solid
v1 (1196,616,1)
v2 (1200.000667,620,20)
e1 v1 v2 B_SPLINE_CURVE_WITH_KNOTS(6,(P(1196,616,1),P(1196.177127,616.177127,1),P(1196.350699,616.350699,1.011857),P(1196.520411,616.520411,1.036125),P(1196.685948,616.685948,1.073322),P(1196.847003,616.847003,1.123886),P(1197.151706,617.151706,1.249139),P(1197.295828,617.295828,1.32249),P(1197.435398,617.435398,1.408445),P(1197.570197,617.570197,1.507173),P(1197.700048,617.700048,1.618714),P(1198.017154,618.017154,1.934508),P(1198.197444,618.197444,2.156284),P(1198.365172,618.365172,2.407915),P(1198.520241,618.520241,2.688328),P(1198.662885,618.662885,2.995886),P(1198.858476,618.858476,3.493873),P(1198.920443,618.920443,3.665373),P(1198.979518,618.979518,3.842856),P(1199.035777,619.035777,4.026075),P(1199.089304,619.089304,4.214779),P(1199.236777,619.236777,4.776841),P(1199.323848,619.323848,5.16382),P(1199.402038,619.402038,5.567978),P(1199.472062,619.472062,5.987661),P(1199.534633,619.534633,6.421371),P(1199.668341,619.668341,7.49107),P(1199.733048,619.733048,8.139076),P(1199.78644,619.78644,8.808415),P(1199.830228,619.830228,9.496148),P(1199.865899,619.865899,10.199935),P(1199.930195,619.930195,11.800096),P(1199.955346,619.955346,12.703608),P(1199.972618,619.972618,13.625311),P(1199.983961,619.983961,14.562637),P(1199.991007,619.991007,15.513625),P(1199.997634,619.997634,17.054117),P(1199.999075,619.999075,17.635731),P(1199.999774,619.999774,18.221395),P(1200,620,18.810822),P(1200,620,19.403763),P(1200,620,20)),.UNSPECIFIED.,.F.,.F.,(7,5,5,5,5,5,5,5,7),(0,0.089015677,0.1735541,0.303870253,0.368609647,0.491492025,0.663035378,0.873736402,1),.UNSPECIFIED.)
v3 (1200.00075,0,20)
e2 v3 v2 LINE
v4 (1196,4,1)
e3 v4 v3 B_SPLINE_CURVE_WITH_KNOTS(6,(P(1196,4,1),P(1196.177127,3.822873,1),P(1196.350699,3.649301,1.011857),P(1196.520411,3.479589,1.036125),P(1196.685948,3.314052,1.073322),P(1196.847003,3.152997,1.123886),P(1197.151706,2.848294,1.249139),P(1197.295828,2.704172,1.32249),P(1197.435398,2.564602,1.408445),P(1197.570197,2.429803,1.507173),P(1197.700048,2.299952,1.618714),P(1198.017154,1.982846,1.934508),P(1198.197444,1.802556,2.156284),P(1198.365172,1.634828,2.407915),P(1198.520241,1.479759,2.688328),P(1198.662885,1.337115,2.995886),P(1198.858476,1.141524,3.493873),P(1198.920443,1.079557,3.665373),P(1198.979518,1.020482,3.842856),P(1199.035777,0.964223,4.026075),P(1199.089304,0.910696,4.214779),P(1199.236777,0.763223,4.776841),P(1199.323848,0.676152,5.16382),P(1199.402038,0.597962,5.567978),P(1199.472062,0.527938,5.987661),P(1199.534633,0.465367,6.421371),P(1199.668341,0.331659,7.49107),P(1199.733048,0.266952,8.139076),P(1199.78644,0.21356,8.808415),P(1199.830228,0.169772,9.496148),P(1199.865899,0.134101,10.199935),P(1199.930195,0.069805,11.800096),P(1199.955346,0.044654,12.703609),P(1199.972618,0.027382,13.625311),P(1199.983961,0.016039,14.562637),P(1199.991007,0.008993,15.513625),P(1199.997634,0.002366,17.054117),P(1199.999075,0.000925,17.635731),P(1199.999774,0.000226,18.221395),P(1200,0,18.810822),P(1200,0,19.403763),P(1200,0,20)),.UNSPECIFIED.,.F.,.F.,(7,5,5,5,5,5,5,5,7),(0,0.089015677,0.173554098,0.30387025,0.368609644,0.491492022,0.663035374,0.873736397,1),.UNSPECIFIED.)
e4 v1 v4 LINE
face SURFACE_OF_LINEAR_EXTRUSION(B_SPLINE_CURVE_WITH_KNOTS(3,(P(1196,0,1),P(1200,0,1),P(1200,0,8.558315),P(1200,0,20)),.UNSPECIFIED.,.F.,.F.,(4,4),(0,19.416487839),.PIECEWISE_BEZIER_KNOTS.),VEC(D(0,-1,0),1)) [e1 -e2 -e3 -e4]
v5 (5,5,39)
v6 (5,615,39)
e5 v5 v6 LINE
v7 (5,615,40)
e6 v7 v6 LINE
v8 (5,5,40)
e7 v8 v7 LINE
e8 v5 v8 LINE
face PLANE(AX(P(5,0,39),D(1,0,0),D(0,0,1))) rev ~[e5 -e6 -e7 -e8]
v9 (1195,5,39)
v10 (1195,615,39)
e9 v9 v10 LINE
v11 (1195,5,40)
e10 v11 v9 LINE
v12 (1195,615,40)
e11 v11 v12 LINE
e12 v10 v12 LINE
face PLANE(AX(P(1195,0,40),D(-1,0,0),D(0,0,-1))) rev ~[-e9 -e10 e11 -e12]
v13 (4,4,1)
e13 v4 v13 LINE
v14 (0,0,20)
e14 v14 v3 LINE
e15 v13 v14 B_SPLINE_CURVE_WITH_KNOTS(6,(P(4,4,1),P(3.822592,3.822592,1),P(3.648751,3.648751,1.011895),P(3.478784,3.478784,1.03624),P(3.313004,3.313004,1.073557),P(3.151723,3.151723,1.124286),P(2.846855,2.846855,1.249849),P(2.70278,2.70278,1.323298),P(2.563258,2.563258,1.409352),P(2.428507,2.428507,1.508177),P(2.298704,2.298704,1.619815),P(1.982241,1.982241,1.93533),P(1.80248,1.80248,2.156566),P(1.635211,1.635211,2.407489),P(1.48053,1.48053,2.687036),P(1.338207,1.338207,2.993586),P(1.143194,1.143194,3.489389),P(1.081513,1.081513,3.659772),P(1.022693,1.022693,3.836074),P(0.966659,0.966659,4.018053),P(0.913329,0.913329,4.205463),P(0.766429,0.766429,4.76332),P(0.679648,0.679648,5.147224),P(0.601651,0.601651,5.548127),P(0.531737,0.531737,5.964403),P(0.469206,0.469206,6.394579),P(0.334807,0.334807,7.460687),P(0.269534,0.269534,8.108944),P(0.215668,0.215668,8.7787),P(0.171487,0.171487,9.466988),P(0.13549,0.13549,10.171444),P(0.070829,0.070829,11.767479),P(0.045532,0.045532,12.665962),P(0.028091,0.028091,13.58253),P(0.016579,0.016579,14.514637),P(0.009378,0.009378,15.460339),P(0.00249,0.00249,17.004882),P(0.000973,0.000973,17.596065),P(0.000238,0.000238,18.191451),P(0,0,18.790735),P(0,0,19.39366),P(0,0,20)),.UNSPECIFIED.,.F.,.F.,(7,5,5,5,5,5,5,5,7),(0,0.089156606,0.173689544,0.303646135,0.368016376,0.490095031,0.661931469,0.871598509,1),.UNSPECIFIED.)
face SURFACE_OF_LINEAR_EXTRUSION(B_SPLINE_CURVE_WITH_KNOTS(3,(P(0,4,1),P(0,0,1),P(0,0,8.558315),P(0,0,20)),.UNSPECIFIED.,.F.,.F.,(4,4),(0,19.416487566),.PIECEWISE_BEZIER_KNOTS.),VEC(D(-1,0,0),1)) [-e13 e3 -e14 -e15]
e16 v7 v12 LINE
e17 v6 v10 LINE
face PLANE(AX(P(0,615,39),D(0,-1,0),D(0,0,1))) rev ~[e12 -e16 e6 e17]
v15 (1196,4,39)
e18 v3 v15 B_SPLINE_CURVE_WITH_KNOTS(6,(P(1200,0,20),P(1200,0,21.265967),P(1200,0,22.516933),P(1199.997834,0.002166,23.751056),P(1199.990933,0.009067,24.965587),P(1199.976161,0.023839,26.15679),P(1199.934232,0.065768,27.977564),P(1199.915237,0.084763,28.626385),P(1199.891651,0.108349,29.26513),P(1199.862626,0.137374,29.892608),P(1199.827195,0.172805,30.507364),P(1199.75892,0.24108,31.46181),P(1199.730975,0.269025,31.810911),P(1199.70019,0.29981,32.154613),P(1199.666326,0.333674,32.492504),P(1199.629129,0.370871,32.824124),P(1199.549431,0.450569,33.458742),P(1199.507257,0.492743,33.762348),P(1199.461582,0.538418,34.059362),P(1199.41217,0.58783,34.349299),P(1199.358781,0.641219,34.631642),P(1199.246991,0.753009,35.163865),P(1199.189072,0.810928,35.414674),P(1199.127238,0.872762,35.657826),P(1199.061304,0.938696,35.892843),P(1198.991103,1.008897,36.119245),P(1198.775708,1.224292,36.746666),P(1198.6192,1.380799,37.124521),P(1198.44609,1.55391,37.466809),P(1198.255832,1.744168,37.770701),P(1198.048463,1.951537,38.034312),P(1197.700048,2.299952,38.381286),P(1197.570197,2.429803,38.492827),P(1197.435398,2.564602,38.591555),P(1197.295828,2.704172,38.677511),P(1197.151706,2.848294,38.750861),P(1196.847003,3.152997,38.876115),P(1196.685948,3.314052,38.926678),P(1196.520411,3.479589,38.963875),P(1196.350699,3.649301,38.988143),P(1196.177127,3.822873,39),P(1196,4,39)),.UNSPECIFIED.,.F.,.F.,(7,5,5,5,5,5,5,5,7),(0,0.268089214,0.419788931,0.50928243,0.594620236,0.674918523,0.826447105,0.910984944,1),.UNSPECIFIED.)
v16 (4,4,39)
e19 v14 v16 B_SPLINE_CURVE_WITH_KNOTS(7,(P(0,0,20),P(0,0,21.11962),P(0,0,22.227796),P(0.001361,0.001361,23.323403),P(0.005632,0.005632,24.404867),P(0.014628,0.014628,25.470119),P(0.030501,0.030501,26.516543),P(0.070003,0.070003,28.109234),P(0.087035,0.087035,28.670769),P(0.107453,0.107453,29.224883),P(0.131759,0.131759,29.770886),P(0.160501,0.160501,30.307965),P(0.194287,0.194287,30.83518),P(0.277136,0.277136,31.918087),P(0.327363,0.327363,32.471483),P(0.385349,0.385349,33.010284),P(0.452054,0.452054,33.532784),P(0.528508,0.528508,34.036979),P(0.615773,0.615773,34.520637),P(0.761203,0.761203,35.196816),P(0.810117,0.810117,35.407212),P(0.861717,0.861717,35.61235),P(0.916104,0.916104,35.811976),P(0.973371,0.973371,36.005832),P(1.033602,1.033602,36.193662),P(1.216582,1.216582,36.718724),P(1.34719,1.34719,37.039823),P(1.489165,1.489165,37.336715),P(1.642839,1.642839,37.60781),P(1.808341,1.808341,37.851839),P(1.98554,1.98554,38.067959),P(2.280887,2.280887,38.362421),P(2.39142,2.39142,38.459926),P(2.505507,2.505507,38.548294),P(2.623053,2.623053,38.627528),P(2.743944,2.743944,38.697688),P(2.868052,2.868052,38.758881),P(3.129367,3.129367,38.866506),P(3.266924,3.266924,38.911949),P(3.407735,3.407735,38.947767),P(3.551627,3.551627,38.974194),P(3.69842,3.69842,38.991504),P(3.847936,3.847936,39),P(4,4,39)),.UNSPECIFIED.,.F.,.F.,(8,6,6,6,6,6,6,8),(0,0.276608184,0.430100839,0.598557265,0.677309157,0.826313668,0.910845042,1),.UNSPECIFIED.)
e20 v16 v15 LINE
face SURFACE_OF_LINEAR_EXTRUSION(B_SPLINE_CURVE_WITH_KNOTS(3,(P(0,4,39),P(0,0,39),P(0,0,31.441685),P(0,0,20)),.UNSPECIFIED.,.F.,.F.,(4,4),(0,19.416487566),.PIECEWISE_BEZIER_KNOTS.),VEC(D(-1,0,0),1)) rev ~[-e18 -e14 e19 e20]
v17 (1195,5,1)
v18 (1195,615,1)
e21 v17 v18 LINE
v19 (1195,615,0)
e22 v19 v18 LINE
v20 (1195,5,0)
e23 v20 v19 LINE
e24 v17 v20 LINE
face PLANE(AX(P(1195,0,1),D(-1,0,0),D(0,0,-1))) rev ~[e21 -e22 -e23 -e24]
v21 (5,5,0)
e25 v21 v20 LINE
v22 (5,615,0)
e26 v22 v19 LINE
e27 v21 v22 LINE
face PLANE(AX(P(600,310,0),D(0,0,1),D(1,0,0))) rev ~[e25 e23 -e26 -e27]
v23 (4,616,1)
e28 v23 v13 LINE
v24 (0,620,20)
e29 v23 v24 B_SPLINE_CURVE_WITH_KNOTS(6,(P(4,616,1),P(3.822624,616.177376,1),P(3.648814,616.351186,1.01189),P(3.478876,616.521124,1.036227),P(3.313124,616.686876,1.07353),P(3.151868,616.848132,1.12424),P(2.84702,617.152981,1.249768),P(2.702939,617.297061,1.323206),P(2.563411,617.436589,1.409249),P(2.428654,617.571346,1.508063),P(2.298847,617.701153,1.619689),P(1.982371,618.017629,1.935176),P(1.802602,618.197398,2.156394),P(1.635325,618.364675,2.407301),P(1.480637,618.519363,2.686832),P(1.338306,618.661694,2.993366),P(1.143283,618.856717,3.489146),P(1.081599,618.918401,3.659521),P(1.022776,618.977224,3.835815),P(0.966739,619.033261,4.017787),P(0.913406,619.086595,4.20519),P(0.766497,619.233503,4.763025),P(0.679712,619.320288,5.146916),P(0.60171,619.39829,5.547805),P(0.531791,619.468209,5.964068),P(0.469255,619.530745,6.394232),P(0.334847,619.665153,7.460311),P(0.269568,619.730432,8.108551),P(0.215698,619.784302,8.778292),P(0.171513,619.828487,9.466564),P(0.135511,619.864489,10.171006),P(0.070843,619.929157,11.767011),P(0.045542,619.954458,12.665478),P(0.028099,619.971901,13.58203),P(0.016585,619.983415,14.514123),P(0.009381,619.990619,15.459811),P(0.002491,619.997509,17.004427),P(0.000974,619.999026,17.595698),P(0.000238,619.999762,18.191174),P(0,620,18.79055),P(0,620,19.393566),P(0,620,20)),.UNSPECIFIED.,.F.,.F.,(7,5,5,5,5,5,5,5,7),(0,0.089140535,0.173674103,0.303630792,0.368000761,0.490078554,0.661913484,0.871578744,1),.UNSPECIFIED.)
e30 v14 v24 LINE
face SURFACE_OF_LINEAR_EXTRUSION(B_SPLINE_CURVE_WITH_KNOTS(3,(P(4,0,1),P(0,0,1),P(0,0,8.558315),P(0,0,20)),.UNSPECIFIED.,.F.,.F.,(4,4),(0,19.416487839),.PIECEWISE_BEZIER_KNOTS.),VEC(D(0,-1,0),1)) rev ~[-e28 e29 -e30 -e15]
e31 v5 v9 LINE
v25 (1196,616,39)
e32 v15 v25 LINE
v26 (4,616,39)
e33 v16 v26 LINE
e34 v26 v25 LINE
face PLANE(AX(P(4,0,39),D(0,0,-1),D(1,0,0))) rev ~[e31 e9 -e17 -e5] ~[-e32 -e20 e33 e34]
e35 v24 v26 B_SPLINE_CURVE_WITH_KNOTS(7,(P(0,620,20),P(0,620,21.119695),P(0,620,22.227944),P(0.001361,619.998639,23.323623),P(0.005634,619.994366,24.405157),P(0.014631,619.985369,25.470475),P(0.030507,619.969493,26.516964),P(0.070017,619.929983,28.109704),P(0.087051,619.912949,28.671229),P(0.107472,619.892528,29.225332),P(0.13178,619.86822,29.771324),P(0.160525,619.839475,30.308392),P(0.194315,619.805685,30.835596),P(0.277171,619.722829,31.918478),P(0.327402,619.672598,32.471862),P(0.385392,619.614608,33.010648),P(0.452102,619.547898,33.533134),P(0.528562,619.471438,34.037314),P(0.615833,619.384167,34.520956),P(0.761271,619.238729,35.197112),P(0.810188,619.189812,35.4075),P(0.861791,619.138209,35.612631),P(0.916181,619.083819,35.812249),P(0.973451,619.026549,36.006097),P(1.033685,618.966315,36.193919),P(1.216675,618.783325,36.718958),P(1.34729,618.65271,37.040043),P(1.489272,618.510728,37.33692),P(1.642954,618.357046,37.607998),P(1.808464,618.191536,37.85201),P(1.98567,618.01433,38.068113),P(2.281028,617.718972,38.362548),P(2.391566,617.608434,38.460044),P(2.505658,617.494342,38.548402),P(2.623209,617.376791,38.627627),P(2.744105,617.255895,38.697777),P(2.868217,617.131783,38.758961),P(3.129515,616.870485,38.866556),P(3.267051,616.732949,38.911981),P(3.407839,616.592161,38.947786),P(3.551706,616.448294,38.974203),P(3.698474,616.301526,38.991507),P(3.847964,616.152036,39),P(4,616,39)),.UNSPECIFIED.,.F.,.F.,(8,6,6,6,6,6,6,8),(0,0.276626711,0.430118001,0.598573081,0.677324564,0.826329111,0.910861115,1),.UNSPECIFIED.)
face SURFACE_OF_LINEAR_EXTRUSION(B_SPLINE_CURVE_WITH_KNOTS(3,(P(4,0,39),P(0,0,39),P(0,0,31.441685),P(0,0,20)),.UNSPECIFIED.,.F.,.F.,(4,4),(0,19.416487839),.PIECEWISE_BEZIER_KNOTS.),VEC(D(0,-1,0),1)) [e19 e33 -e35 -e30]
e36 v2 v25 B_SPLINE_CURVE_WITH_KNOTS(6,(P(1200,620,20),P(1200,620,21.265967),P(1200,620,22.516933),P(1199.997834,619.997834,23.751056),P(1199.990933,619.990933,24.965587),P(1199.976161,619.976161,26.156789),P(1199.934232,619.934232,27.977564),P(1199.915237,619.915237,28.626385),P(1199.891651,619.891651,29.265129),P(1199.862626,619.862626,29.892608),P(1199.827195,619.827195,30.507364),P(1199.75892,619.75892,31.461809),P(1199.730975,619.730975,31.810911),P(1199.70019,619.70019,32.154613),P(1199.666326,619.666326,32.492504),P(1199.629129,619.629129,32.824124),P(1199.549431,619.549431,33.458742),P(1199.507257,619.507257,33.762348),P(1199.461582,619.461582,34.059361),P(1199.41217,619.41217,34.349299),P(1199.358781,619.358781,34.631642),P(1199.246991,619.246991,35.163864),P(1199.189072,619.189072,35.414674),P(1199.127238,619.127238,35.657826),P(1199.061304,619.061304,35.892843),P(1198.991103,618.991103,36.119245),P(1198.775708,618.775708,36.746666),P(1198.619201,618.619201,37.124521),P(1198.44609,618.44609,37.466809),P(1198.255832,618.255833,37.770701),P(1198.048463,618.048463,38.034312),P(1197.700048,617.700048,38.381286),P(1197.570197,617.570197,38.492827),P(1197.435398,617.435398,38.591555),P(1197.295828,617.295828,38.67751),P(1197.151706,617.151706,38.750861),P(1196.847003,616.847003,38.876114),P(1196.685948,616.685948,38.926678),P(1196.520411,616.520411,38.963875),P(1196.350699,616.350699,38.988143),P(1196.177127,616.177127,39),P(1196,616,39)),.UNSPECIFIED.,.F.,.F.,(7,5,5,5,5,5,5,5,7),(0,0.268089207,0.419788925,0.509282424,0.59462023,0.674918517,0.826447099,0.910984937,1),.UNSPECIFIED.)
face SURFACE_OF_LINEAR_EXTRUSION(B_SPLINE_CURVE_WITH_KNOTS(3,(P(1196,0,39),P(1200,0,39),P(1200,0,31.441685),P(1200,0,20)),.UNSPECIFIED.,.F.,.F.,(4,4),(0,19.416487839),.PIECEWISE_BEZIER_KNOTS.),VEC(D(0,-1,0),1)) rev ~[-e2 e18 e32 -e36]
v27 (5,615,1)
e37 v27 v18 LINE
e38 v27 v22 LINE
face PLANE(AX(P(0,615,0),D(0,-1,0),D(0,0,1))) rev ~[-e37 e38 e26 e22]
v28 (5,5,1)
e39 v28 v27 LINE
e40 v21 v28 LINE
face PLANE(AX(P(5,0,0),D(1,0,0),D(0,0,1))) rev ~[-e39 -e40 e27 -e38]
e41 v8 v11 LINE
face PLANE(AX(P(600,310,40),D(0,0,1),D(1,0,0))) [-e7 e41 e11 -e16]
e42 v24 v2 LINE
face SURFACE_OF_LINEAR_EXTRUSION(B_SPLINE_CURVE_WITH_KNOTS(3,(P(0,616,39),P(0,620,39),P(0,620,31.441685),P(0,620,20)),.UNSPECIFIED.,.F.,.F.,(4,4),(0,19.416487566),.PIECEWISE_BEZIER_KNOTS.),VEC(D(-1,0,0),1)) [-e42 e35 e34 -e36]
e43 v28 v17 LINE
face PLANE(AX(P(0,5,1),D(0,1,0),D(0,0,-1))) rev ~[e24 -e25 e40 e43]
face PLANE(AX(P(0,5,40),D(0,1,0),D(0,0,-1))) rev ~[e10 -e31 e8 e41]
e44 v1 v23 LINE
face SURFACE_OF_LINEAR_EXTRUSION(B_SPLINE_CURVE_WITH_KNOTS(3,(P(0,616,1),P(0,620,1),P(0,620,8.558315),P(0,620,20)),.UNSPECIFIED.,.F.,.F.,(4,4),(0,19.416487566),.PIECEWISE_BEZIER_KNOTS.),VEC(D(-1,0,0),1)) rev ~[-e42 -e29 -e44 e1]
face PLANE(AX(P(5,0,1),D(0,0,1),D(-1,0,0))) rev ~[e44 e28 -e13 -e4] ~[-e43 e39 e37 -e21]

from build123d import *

# Parameters (mm, degrees)
F0_W     = 1200
F0_H     = 620
F1_DEPTH = 40
F3_DEPTH = 620.001
F6_DEPTH = 1200.0010001015


# Not quite as in the source:
# - ends of sketch curves that miss each other by under 0.0002 mm in the source are joined


with BuildPart() as f1:
    # F0 (on Top) → F1 (new body)
    with BuildSketch(Plane.XY):
        with Locations((600, 310)):
            Rectangle(F0_W, F0_H)
    extrude(amount=F1_DEPTH)

    # F2 (on face) → F3 (cut, through all)
    with BuildSketch(Plane.XZ):
        with BuildLine():
            add(Edge.make_bspline(
                [(4, 1), (0, 1), (0, 8.5583151877), (0, 20)],
                knots=[0, 0, 0, 0, 19.4164878389, 19.4164878389, 19.4164878389, 19.4164878389], degree=3))
            Line((0, 20), (0, 0))
            Line((0, 0), (5, 0))
            Line((5, 0), (5, 1))
            Line((5, 1), (4, 1))
        make_face()
        with BuildLine():
            add(Edge.make_bspline(
                [(4, 39), (0, 39), (0, 31.4416848123), (0, 20)],
                knots=[0, 0, 0, 0, 19.4164878389, 19.4164878389, 19.4164878389, 19.4164878389], degree=3))
            Line((4, 39), (5, 39))
            Line((5, 39), (5, 40))
            Line((5, 40), (0, 40))
            Line((0, 40), (0, 20))
        make_face()
        with BuildLine():
            add(Edge.make_bspline(
                [(1196, 39), (1200, 39), (1200, 31.4416848123), (1200, 20)],
                knots=[0, 0, 0, 0, 19.4164878389, 19.4164878389, 19.4164878389, 19.4164878389], degree=3))
            Line((1200, 20), (1200, 40))
            Line((1200, 40), (1195, 40))
            Line((1195, 40), (1195, 39))
            Line((1195, 39), (1196, 39))
        make_face()
        with BuildLine():
            Line((1195, 1), (1195, 0))
            Line((1195, 0), (1200, 0))
            Line((1200, 0), (1200, 20))
            add(Edge.make_bspline(
                [(1196, 1), (1200, 1), (1200, 8.5583151877), (1200, 20)],
                knots=[0, 0, 0, 0, 19.4164878389, 19.4164878389, 19.4164878389, 19.4164878389], degree=3))
            Line((1196, 1), (1195, 1))
        make_face()
    extrude(amount=-F3_DEPTH, mode=Mode.SUBTRACT)

    # F5 (on offset) → F6 (cut, through all)
    with BuildSketch(Plane(origin=(0, 0, 0), x_dir=(0, -1, 0), z_dir=(-1, 0, 0))):
        with BuildLine():
            add(Edge.make_bspline(
                [(-616.000000023, 1), (-620, 1), (-620, 8.5583149148), (-620, 19.9999997259)],
                knots=[0, 0, 0, 0, 19.416487566, 19.416487566, 19.416487566, 19.416487566], degree=3))
            Line((-620, 19.9999997259), (-620, 0))
            Line((-620, 0), (-615, 0))
            Line((-615, 0), (-615, 1))
            Line((-615, 1), (-616.000000023, 1))
        make_face()
        with BuildLine():
            add(Edge.make_bspline(
                [(-616.000000023, 39), (-620, 39), (-620, 31.4416850852), (-620, 20.0000002741)],
                knots=[0, 0, 0, 0, 19.416487566, 19.416487566, 19.416487566, 19.416487566], degree=3))
            Line((-616.000000023, 39), (-615, 39))
            Line((-615, 39), (-615, 40))
            Line((-615, 40), (-620, 40))
            Line((-620, 40), (-620, 20.0000002741))
        make_face()
        with BuildLine():
            add(Edge.make_bspline(
                [(-3.999999977, 39), (0, 39), (0, 31.4416850853), (0, 20.0000002741)],
                knots=[0, 0, 0, 0, 19.416487566, 19.416487566, 19.416487566, 19.416487566], degree=3))
            Line((0, 20.0000002741), (0, 40))
            Line((0, 40), (-5, 40))
            Line((-5, 40), (-5, 39))
            Line((-5, 39), (-3.999999977, 39))
        make_face()
        with BuildLine():
            Line((-5, 1), (-5, 0))
            Line((-5, 0), (0, 0))
            Line((0, 0), (0, 20))
            add(Edge.make_bspline(
                [(-3.999999977, 1), (0, 1), (0, 8.5583149148), (0, 20)],
                knots=[0, 0, 0, 0, 19.416487566, 19.416487566, 19.416487566, 19.416487566], degree=3))
            Line((-3.999999977, 1), (-5, 1))
        make_face()
    extrude(amount=-F6_DEPTH, mode=Mode.SUBTRACT)


solid = f1.part
